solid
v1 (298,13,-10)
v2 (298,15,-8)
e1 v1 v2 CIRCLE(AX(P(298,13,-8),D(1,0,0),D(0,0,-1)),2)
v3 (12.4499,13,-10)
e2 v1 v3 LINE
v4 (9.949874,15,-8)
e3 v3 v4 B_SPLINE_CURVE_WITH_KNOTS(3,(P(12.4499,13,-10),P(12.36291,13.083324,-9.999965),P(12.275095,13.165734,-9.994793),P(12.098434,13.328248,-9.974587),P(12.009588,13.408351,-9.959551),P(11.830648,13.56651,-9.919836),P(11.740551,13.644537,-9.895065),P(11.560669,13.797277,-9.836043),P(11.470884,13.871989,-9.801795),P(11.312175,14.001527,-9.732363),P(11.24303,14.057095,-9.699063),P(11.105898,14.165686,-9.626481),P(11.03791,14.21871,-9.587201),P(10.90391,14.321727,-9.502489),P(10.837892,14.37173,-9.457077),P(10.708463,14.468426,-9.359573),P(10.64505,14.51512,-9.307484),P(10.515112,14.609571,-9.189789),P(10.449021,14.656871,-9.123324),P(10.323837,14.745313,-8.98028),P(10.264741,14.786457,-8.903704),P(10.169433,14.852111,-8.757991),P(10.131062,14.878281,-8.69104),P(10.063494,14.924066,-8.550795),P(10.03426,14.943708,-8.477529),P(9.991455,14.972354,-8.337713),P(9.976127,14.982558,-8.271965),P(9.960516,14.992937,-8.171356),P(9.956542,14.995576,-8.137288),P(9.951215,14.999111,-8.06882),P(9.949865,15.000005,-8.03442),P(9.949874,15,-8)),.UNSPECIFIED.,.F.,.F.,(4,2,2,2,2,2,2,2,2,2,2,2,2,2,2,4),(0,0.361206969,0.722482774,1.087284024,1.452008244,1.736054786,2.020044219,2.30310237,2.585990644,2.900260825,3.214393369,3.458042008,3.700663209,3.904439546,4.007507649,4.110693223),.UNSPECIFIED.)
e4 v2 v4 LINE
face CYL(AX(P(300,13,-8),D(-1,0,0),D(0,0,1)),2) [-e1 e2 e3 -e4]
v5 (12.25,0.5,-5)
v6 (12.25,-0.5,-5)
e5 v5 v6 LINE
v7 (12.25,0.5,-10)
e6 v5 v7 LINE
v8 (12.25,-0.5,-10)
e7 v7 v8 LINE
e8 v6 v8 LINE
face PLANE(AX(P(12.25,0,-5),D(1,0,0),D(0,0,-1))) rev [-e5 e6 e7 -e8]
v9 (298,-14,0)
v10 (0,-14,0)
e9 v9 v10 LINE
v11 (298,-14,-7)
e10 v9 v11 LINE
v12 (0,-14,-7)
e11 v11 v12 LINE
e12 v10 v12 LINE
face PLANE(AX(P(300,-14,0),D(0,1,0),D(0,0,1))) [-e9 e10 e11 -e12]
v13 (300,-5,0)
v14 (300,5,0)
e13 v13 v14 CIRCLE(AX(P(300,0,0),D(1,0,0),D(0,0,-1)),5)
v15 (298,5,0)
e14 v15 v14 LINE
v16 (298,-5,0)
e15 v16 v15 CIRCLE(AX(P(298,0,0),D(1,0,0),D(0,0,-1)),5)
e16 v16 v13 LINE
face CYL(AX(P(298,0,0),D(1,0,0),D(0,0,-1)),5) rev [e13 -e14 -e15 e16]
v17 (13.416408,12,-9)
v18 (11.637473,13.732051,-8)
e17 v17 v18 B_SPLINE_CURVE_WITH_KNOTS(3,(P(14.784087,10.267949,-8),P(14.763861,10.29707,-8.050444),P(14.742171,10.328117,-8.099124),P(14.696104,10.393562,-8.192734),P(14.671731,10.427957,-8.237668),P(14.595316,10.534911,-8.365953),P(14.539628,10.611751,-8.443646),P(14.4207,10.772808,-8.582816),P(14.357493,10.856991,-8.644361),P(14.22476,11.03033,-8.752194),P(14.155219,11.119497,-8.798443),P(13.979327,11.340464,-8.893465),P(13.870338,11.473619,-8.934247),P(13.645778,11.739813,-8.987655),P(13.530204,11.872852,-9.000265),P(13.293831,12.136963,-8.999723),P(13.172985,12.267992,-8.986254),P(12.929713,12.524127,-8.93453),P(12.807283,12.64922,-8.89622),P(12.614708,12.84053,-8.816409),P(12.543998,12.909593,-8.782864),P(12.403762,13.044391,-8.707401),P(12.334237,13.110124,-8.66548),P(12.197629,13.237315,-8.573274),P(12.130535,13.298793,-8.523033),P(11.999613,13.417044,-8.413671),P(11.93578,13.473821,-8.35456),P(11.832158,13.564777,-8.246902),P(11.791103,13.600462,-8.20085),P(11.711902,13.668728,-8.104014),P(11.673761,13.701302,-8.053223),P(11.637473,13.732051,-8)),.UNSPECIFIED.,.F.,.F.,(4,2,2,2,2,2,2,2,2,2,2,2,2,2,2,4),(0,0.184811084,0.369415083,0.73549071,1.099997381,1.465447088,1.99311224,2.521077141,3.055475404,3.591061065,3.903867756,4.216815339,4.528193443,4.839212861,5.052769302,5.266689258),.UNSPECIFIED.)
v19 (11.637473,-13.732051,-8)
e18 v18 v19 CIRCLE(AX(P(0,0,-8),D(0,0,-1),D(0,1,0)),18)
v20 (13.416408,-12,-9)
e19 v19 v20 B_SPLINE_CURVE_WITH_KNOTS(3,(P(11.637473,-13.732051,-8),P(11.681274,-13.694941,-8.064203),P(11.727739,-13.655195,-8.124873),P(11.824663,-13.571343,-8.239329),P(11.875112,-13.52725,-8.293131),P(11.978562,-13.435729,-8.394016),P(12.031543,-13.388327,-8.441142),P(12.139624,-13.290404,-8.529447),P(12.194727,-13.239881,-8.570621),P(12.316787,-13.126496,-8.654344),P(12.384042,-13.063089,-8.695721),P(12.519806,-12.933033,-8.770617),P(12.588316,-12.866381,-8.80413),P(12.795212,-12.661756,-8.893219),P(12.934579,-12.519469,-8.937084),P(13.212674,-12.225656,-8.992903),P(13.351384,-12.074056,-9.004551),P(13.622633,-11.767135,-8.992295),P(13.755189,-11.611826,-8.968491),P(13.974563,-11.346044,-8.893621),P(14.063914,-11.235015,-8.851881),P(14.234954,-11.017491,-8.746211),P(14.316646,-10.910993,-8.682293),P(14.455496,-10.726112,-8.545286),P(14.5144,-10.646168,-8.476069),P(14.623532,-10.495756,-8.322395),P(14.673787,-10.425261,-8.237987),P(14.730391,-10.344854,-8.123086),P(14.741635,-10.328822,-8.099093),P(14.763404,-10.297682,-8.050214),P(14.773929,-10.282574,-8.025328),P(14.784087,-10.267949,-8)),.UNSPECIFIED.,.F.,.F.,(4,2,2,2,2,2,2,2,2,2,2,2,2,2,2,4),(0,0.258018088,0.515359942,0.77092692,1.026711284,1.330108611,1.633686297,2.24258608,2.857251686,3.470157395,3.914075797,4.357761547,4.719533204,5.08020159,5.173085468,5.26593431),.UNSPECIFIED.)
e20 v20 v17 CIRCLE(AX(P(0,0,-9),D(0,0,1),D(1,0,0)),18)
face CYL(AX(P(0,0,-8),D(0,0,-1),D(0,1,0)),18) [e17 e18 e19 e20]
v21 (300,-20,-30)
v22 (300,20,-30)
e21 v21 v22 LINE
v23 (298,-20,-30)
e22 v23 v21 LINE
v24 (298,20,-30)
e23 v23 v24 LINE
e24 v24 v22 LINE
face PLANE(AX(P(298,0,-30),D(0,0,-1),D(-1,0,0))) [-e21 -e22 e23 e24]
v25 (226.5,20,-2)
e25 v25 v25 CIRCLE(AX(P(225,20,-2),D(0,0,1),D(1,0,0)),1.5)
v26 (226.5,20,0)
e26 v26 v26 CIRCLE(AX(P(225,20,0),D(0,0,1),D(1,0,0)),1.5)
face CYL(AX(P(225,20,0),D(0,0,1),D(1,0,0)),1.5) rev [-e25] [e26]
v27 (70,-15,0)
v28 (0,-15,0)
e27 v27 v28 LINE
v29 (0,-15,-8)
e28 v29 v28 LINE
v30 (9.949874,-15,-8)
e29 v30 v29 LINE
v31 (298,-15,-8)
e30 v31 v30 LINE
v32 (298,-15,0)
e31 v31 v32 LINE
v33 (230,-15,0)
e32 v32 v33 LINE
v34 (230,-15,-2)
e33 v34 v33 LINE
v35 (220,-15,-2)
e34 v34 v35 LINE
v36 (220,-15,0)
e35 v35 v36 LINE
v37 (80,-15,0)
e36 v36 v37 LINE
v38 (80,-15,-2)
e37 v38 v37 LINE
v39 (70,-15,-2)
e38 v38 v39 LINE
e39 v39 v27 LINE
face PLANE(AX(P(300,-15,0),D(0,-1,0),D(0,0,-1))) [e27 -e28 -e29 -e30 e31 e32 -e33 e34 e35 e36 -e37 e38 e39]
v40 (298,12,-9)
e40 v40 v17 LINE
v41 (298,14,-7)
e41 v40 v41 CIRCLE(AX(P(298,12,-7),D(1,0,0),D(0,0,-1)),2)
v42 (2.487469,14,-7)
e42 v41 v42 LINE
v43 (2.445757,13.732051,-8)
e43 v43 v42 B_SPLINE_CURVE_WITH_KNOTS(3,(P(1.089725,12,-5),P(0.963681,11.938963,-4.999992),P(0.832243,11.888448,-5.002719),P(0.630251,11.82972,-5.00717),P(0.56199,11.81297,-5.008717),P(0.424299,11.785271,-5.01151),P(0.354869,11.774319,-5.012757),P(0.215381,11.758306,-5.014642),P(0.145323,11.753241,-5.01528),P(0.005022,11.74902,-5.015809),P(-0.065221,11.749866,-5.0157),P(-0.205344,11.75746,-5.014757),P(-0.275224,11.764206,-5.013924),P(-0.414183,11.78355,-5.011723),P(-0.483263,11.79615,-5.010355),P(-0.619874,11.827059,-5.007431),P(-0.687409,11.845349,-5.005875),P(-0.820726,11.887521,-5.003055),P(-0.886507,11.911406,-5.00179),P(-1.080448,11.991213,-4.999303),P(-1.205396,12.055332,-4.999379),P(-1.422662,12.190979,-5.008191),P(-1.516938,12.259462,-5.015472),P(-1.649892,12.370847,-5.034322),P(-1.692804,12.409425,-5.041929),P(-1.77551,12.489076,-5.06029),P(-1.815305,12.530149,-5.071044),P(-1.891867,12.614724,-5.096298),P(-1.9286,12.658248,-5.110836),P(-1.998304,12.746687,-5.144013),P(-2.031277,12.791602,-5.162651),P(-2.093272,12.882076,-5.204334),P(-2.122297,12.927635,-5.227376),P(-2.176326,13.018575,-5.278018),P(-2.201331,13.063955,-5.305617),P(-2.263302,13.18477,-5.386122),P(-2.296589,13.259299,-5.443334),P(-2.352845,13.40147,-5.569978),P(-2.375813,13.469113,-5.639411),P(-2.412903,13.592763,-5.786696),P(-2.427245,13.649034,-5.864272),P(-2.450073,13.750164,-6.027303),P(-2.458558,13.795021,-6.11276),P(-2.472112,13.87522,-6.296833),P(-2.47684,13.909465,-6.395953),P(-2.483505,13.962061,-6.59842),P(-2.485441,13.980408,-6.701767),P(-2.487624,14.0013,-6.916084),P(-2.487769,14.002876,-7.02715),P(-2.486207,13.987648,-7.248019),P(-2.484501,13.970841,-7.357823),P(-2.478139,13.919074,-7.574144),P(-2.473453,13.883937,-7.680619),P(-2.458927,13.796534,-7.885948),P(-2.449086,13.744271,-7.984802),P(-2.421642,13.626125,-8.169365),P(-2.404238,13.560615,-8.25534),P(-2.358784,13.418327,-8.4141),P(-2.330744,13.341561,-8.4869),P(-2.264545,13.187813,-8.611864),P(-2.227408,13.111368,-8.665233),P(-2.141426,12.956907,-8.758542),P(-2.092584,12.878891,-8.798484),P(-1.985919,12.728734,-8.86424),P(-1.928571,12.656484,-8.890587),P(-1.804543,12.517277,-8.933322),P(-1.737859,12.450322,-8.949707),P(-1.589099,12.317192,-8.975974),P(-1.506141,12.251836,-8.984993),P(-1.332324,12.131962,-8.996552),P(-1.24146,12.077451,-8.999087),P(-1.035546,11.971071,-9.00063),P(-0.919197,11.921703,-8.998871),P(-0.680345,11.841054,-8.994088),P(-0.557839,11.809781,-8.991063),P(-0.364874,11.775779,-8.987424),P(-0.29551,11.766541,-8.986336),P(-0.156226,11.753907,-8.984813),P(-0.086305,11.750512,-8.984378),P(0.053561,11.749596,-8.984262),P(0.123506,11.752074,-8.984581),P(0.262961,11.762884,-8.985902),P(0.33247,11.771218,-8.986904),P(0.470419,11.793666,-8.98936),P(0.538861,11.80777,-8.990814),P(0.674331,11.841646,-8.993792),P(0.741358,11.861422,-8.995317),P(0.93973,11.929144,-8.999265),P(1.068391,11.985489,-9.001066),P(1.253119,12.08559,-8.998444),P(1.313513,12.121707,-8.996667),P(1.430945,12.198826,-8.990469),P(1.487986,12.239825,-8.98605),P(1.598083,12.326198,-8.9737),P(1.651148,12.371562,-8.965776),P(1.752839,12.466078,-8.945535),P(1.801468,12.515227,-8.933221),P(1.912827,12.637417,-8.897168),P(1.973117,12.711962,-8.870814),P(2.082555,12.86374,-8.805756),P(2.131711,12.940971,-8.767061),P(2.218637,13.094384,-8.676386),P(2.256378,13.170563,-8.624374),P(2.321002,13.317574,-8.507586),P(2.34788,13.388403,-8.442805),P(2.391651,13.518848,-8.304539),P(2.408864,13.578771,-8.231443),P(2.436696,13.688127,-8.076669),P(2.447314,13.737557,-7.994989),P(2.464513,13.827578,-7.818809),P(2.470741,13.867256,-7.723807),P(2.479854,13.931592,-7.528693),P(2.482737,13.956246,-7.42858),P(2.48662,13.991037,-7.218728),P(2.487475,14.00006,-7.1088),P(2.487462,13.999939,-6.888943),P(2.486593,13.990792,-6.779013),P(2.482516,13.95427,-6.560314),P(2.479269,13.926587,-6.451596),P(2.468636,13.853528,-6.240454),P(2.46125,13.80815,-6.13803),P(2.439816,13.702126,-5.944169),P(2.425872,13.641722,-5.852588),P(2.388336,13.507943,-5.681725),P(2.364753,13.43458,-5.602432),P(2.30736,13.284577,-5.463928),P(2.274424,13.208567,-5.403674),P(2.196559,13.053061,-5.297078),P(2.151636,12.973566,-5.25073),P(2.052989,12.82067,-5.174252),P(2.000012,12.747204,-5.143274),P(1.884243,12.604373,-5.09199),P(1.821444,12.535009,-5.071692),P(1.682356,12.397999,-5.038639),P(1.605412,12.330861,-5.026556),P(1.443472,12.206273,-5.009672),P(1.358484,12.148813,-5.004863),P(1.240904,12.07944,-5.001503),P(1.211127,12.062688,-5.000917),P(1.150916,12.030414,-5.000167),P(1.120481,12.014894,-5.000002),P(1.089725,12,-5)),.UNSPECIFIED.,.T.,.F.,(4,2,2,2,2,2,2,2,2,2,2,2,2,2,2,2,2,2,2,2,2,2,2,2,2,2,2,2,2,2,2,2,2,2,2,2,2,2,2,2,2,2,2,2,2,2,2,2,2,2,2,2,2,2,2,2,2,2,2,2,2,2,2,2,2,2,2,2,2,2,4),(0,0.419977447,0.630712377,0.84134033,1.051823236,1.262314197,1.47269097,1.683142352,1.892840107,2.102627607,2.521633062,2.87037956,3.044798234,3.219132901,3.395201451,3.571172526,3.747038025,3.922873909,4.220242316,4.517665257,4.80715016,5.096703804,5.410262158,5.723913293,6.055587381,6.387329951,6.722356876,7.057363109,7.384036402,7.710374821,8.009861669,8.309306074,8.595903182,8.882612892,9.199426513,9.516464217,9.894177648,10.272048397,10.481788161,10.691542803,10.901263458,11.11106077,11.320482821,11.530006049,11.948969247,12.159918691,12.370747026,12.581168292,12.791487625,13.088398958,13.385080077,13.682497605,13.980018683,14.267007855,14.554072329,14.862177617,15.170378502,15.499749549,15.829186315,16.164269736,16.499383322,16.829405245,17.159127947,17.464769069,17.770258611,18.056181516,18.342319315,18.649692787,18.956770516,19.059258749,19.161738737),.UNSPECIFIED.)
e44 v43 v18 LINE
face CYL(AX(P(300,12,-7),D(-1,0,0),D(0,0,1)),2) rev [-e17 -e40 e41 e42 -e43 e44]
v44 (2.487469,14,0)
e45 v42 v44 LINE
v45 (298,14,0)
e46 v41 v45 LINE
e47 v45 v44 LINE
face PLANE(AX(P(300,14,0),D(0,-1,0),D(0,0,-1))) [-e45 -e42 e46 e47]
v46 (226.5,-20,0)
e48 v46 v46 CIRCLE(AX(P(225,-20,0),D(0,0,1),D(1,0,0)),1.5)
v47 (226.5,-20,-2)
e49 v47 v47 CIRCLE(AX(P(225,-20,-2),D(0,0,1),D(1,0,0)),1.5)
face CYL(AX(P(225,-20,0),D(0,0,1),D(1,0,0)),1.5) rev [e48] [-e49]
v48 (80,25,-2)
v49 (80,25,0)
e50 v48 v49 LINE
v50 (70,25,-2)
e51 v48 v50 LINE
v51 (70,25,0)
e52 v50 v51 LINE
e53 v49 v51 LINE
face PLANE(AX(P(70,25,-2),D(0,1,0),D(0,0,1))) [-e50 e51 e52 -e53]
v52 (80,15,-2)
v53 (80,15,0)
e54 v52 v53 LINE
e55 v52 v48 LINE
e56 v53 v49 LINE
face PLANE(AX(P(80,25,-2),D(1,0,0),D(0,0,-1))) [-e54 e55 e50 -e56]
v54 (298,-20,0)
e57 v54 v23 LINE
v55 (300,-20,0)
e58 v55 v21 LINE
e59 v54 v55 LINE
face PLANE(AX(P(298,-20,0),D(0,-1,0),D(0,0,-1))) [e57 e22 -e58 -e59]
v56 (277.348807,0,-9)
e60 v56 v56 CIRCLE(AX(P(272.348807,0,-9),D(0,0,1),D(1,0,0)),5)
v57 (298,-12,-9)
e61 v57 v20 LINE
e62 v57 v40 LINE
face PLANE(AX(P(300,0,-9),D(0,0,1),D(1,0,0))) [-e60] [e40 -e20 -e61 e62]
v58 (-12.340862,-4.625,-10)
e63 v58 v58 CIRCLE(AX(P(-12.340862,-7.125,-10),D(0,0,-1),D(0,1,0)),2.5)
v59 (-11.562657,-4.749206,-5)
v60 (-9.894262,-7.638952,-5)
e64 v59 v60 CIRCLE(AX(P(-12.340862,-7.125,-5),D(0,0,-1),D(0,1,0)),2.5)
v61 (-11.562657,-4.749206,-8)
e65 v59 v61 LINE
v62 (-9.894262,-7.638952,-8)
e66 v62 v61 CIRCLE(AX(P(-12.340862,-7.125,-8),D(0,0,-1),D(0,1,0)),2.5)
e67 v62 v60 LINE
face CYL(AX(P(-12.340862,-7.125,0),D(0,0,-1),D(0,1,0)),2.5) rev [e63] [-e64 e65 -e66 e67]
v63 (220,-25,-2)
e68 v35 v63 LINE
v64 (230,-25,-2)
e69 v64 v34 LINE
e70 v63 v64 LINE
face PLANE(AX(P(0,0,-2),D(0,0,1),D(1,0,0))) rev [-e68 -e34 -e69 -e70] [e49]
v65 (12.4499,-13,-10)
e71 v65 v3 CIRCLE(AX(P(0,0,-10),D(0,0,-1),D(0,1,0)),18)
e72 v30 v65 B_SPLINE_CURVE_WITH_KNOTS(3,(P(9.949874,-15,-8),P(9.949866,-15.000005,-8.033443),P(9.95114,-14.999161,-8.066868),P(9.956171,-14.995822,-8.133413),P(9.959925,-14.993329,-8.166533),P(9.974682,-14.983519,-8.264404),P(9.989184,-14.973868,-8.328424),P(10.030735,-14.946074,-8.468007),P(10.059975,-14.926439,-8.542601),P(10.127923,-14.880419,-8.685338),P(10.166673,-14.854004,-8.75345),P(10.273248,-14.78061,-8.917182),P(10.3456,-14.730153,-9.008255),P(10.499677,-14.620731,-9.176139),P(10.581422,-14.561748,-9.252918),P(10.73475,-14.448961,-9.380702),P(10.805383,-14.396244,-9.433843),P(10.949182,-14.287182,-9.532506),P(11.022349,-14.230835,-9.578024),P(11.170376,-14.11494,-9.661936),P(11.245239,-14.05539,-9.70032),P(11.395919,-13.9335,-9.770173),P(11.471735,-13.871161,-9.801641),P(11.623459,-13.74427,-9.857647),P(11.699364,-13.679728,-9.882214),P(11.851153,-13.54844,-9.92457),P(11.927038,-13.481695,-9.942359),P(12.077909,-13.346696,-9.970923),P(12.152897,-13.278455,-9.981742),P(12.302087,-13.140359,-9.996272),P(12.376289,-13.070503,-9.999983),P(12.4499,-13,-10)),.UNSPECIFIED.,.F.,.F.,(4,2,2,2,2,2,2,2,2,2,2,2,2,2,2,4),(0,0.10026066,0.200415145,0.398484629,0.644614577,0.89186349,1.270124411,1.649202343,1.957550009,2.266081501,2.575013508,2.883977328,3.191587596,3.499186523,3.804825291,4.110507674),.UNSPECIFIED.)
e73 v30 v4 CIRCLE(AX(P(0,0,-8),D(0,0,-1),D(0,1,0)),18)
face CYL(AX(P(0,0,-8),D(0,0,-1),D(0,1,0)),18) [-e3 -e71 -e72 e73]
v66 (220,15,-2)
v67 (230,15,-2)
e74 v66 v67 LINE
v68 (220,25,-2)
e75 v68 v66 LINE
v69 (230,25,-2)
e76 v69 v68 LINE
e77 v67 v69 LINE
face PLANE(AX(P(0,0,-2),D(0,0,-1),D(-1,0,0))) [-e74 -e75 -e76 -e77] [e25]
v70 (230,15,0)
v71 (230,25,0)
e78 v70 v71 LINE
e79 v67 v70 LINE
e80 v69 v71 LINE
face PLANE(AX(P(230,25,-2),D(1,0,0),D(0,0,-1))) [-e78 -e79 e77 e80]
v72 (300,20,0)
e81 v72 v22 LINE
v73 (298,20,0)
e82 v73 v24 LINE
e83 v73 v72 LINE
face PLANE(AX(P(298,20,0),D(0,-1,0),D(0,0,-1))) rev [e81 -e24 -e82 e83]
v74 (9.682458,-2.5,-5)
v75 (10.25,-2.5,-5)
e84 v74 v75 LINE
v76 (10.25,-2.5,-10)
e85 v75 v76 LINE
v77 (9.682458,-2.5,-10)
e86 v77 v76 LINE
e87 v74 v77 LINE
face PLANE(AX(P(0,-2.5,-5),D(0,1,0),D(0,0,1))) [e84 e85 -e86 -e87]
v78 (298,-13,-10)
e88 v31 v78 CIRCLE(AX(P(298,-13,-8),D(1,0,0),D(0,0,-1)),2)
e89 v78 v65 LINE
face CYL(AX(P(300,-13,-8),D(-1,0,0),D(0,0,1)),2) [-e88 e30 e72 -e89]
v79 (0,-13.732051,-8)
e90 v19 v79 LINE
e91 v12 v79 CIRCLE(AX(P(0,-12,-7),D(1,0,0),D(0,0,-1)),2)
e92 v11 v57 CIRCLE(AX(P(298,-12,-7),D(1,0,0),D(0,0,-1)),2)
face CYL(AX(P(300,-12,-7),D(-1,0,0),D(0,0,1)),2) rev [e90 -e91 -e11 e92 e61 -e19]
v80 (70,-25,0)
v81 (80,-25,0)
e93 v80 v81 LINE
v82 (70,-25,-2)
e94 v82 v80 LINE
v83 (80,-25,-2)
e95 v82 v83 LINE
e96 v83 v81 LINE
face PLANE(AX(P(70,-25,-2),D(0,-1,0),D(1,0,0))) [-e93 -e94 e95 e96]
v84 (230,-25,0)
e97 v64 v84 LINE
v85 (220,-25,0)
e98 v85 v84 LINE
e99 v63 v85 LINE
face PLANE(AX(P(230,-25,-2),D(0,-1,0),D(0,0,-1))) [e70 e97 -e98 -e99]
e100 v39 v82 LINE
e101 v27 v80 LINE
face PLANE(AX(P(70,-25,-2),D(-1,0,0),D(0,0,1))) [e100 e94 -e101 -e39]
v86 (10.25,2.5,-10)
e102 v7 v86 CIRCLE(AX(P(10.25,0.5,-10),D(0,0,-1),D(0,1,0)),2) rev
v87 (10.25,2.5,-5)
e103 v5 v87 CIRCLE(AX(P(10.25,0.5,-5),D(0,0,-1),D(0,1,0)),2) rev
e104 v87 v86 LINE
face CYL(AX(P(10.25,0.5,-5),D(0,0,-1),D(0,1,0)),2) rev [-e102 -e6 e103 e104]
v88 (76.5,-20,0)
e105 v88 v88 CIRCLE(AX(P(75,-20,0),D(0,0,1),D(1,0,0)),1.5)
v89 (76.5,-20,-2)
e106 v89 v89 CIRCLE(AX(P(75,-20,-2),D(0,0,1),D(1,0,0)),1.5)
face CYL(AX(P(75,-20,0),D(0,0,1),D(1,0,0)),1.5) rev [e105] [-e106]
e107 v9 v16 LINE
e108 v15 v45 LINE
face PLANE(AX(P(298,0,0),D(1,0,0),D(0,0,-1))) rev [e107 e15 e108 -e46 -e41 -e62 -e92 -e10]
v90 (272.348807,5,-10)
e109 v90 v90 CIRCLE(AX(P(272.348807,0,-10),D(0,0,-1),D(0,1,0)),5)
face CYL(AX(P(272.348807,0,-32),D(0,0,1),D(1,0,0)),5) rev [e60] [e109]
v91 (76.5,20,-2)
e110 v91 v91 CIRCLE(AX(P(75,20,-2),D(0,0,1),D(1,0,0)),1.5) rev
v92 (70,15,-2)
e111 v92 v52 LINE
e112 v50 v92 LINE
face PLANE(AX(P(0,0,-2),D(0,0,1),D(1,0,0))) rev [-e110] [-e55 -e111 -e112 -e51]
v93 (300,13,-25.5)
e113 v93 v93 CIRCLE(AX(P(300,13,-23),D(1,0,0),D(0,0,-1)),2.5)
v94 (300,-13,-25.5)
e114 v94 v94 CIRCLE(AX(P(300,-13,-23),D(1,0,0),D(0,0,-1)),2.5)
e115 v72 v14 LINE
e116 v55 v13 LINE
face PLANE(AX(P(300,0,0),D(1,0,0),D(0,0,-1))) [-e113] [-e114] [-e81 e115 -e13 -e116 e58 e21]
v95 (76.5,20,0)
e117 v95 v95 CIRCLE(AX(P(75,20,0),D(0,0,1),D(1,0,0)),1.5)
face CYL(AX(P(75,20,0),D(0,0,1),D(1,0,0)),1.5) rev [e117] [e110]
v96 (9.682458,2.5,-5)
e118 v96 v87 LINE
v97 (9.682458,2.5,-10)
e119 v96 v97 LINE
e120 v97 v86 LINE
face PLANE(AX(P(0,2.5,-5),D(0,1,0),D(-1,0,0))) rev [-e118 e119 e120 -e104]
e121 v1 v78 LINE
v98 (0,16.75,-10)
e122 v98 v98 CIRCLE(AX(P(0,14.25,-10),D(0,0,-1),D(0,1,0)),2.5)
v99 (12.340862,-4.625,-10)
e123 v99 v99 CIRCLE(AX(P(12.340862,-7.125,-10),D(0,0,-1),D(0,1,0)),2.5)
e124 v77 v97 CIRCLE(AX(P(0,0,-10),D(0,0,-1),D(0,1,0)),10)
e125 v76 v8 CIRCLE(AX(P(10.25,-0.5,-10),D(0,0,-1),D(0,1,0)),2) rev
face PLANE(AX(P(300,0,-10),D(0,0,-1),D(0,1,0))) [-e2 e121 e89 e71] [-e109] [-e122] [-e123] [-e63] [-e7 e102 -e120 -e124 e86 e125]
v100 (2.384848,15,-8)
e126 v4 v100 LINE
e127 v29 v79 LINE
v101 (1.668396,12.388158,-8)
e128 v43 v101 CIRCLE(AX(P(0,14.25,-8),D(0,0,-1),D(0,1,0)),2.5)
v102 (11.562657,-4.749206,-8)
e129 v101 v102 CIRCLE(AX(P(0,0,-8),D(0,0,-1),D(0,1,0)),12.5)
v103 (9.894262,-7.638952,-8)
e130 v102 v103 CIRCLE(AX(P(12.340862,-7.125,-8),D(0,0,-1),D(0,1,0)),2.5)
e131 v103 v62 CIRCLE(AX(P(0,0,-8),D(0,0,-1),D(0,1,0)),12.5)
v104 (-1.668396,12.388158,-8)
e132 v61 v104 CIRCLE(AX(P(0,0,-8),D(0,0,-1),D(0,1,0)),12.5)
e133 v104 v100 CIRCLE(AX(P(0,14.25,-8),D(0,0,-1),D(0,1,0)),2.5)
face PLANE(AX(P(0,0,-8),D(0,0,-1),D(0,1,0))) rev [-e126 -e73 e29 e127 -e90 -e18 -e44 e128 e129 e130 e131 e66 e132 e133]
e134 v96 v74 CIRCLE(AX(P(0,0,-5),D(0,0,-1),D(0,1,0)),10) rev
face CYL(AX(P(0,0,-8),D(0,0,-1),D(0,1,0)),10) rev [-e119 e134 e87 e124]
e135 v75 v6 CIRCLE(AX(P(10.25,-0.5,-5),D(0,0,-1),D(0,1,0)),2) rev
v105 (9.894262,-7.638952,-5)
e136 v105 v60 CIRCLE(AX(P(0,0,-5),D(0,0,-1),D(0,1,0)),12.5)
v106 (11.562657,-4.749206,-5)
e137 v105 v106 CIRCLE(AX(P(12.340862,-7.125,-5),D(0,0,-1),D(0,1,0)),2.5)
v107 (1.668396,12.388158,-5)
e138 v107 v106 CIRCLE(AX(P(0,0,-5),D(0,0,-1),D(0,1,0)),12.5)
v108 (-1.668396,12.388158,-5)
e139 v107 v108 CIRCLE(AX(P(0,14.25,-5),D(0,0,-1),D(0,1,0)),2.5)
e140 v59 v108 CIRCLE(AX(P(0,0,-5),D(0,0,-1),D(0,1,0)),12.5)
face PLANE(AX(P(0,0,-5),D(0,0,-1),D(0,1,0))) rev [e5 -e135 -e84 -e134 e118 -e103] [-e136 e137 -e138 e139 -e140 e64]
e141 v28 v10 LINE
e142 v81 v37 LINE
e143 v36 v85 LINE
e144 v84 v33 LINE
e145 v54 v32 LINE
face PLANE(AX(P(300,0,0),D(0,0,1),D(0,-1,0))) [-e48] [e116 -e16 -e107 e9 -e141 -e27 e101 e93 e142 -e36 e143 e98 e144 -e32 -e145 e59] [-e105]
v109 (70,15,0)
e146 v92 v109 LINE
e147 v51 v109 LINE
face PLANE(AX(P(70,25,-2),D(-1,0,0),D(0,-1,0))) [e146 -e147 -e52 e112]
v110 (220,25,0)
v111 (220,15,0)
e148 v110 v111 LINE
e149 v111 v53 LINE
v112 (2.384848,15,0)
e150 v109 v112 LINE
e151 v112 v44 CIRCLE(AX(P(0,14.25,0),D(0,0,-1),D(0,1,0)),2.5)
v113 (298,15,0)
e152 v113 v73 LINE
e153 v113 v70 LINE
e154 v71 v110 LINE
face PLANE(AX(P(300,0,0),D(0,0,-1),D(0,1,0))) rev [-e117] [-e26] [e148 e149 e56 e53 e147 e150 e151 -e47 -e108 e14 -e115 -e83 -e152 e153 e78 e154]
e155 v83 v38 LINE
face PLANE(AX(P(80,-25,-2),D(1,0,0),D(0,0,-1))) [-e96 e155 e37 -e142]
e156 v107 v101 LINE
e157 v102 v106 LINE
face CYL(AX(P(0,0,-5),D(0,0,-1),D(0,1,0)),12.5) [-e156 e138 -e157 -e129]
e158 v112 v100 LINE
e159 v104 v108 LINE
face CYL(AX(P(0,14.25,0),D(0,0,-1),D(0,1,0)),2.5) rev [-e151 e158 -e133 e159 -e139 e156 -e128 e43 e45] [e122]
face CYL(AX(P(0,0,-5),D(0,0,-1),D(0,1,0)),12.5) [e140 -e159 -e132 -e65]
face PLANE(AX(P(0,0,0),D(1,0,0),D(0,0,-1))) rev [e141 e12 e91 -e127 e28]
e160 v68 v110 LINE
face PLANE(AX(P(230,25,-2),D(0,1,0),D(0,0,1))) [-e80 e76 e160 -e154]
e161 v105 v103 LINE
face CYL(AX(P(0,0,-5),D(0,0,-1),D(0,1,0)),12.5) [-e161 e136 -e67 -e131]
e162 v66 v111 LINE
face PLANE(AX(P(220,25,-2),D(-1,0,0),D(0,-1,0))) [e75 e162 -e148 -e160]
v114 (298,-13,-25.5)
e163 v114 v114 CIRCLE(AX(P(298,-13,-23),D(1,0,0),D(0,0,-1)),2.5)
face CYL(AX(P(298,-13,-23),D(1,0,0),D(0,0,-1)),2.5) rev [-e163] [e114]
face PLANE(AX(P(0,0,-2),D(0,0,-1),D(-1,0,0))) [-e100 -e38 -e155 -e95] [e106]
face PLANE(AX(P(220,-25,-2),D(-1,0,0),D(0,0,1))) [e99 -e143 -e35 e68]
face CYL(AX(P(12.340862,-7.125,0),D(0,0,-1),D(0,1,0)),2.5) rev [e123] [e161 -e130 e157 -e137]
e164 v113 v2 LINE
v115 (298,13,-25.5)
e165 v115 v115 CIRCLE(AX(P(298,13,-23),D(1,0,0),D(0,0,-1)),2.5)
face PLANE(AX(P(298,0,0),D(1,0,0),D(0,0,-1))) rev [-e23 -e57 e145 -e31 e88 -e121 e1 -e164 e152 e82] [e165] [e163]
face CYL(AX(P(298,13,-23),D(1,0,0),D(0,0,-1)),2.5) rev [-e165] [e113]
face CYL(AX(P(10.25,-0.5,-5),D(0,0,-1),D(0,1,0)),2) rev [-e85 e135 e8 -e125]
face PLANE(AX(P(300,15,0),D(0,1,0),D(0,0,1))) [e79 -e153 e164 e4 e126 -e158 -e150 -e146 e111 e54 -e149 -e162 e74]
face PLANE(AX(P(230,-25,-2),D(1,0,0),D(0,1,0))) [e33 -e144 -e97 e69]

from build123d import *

# Parameters (mm, degrees)
BOSS_EXTRUDE1_DEPTH     = 300
SKETCH2_W               = 10
SKETCH2_H               = 10
BOSS_EXTRUDE2_DEPTH     = 2
SKETCH4_R               = 18
SKETCH4_R_2             = 15
SKETCH4_R_3             = 10
BOSS_EXTRUDE3_DEPTH     = 2
SKETCH4_3_R             = 10
CUT_EXTRUDE1_DEPTH      = 2
BOSS_EXTRUDE4_START     = -5
BOSS_EXTRUDE4_OUTLINE_R = 12.5
BOSS_EXTRUDE4_DEPTH     = 3
CUT_EXTRUDE2_START      = -2
CUT_EXTRUDE2_DEPTH      = 2
F_3_0MM_DOWEL_HOLE1_D   = 3
SKETCH8_R               = 2.5
BOSS_EXTRUDE5_DEPTH     = 2
SKETCH9_R               = 5
CUT_EXTRUDE3_DEPTH      = 32
SKETCH10_R              = 2.5
CUT_EXTRUDE4_DEPTH      = 10


# Read off the part's stored shape, not the designer's step: Boss-Extrude4, Cut-Extrude2
with BuildPart() as part:
    # Sketch1 → Boss-Extrude1 (new body)
    with BuildSketch(Plane(origin=(0, 0, 0), x_dir=(0, 0, -1), z_dir=(1, 0, 0))):
        with BuildLine():
            Line((10, 13), (10, -13))
            ThreePointArc((10, -13), (9.414213562, -14.414213562), (8, -15))
            Line((8, -15), (0, -15))
            Line((0, -15), (0, -14))
            Line((0, -14), (7, -14))
            ThreePointArc((7, -14), (8.414213562, -13.414213562), (9, -12))
            Line((9, -12), (9, 12))
            ThreePointArc((9, 12), (8.414213562, 13.414213562), (7, 14))
            Line((7, 14), (0, 14))
            Line((0, 14), (0, 15))
            Line((0, 15), (8, 15))
            ThreePointArc((8, 15), (9.414213562, 14.414213562), (10, 13))
        make_face()
    extrude(amount=BOSS_EXTRUDE1_DEPTH)

    # Sketch2 → Boss-Extrude2 (add)
    with BuildSketch(Plane.XY):
        with Locations((75, 20)):
            Rectangle(SKETCH2_W, SKETCH2_H)
        with Locations((75, -20)):
            Rectangle(SKETCH2_W, SKETCH2_H)
        with Locations((225, 20)):
            Rectangle(SKETCH2_W, SKETCH2_H)
        with Locations((225, -20)):
            Rectangle(SKETCH2_W, SKETCH2_H)
    extrude(amount=-BOSS_EXTRUDE2_DEPTH)

    # Sketch4 → Boss-Extrude3 (add)
    # profile 1 of 2: a face of its own
    with BuildSketch(Plane(origin=(0, 0, -10), x_dir=(-1, 0, 0), z_dir=(0, 0, -1))):
        Circle(SKETCH4_R)
        Circle(SKETCH4_R_2, mode=Mode.SUBTRACT)
    # profile 2 of 2: a face of its own
    with BuildSketch(Plane(origin=(0, 0, -10), x_dir=(-1, 0, 0), z_dir=(0, 0, -1))):
        Circle(SKETCH4_R)
        with Locations(Location((0, 0, 0), (0, 0, 90))):
            Circle(SKETCH4_R_3, mode=Mode.SUBTRACT)
    extrude(amount=-BOSS_EXTRUDE3_DEPTH)

    # Sketch4<3> → Cut-Extrude1 (cut)
    with BuildSketch(Plane(origin=(0, 0, -10), x_dir=(-1, 0, 0), z_dir=(0, 0, -1))):
        with Locations(Location((0, 0, 0), (0, 0, 90))):
            Circle(SKETCH4_3_R)
    extrude(amount=-CUT_EXTRUDE1_DEPTH, mode=Mode.SUBTRACT)

    # Boss-Extrude4 outline → Boss-Extrude4 (add)
    with BuildSketch(Plane(origin=(0, 0, -10), x_dir=(-1, 0, 0), z_dir=(0, 0, -1)).offset(BOSS_EXTRUDE4_START)):
        Circle(BOSS_EXTRUDE4_OUTLINE_R)
        with BuildLine():
            ThreePointArc((-9.682458366, 2.5), (10, 0), (-9.682458366, -2.5))
            Line((-9.682458366, -2.5), (-10.25, -2.5))
            ThreePointArc((-10.25, -2.5), (-11.664213562, -1.914213562), (-12.25, -0.5))
            Line((-12.25, -0.5), (-12.25, 0.5))
            ThreePointArc((-12.25, 0.5), (-11.664213562, 1.914213562), (-10.25, 2.5))
            Line((-10.25, 2.5), (-9.682458366, 2.5))
        make_face(mode=Mode.SUBTRACT)
    extrude(amount=BOSS_EXTRUDE4_DEPTH)

    # Cut-Extrude2 outline → Cut-Extrude2 (cut)
    with BuildSketch(Plane(origin=(0, 0, -10), x_dir=(-1, 0, 0), z_dir=(0, 0, -1)).offset(CUT_EXTRUDE2_START)):
        with BuildLine():
            ThreePointArc((-10.25, 2.5), (-11.664213562, 1.914213562), (-12.25, 0.5))
            Line((-12.25, 0.5), (-12.25, -0.5))
            ThreePointArc((-12.25, -0.5), (-11.664213562, -1.914213562), (-10.25, -2.5))
            Line((-10.25, -2.5), (-9.682458366, -2.5))
            ThreePointArc((-9.682458366, -2.5), (-10, 0), (-9.682458366, 2.5))
            Line((-9.682458366, 2.5), (-10.25, 2.5))
        make_face()
    extrude(amount=CUT_EXTRUDE2_DEPTH, mode=Mode.SUBTRACT)

    # Ø3.0mm Dowel Hole1 (through all)
    with Locations(Plane.XY):
        with Locations((75, 20), (75, -20), (225, 20), (225, -20)):
            Hole(F_3_0MM_DOWEL_HOLE1_D / 2)

    # Sketch8 → Boss-Extrude5 (add)
    with BuildSketch(Plane(origin=(300, 0, 0), x_dir=(0, 0, -1), z_dir=(1, 0, 0))):
        with BuildLine():
            Line((0, -5), (0, -20))
            Line((0, -20), (30, -20))
            Line((30, -20), (30, 20))
            Line((30, 20), (0, 20))
            Line((0, 20), (0, 5))
            ThreePointArc((0, 5), (3.535533906, 3.535533906), (5, 0))
            ThreePointArc((5, 0), (3.535533906, -3.535533906), (0, -5))
        make_face()
        with Locations((23, -13)):
            Circle(SKETCH8_R, mode=Mode.SUBTRACT)
        with Locations((23, 13)):
            Circle(SKETCH8_R, mode=Mode.SUBTRACT)
    extrude(amount=-BOSS_EXTRUDE5_DEPTH)

    # Sketch9 → Cut-Extrude3 (cut)
    with BuildSketch(Plane.XY):
        with Locations((272.348806761, 0)):
            Circle(SKETCH9_R)
    extrude(amount=-CUT_EXTRUDE3_DEPTH, mode=Mode.SUBTRACT)

    # Sketch10 → Cut-Extrude4 (cut)
    with BuildSketch(Plane(origin=(0, 0, -10), x_dir=(-1, 0, 0), z_dir=(0, 0, -1))):
        with Locations(Location((0, 14.25, 0), (0, 0, 90))):
            Circle(SKETCH10_R)
        with Locations(Location((12.340862004, -7.125, 0), (0, 0, 90))):
            Circle(SKETCH10_R)
        with Locations(Location((-12.340862004, -7.125, 0), (0, 0, 90))):
            Circle(SKETCH10_R)
    extrude(amount=-CUT_EXTRUDE4_DEPTH, mode=Mode.SUBTRACT)


solid = part.part
